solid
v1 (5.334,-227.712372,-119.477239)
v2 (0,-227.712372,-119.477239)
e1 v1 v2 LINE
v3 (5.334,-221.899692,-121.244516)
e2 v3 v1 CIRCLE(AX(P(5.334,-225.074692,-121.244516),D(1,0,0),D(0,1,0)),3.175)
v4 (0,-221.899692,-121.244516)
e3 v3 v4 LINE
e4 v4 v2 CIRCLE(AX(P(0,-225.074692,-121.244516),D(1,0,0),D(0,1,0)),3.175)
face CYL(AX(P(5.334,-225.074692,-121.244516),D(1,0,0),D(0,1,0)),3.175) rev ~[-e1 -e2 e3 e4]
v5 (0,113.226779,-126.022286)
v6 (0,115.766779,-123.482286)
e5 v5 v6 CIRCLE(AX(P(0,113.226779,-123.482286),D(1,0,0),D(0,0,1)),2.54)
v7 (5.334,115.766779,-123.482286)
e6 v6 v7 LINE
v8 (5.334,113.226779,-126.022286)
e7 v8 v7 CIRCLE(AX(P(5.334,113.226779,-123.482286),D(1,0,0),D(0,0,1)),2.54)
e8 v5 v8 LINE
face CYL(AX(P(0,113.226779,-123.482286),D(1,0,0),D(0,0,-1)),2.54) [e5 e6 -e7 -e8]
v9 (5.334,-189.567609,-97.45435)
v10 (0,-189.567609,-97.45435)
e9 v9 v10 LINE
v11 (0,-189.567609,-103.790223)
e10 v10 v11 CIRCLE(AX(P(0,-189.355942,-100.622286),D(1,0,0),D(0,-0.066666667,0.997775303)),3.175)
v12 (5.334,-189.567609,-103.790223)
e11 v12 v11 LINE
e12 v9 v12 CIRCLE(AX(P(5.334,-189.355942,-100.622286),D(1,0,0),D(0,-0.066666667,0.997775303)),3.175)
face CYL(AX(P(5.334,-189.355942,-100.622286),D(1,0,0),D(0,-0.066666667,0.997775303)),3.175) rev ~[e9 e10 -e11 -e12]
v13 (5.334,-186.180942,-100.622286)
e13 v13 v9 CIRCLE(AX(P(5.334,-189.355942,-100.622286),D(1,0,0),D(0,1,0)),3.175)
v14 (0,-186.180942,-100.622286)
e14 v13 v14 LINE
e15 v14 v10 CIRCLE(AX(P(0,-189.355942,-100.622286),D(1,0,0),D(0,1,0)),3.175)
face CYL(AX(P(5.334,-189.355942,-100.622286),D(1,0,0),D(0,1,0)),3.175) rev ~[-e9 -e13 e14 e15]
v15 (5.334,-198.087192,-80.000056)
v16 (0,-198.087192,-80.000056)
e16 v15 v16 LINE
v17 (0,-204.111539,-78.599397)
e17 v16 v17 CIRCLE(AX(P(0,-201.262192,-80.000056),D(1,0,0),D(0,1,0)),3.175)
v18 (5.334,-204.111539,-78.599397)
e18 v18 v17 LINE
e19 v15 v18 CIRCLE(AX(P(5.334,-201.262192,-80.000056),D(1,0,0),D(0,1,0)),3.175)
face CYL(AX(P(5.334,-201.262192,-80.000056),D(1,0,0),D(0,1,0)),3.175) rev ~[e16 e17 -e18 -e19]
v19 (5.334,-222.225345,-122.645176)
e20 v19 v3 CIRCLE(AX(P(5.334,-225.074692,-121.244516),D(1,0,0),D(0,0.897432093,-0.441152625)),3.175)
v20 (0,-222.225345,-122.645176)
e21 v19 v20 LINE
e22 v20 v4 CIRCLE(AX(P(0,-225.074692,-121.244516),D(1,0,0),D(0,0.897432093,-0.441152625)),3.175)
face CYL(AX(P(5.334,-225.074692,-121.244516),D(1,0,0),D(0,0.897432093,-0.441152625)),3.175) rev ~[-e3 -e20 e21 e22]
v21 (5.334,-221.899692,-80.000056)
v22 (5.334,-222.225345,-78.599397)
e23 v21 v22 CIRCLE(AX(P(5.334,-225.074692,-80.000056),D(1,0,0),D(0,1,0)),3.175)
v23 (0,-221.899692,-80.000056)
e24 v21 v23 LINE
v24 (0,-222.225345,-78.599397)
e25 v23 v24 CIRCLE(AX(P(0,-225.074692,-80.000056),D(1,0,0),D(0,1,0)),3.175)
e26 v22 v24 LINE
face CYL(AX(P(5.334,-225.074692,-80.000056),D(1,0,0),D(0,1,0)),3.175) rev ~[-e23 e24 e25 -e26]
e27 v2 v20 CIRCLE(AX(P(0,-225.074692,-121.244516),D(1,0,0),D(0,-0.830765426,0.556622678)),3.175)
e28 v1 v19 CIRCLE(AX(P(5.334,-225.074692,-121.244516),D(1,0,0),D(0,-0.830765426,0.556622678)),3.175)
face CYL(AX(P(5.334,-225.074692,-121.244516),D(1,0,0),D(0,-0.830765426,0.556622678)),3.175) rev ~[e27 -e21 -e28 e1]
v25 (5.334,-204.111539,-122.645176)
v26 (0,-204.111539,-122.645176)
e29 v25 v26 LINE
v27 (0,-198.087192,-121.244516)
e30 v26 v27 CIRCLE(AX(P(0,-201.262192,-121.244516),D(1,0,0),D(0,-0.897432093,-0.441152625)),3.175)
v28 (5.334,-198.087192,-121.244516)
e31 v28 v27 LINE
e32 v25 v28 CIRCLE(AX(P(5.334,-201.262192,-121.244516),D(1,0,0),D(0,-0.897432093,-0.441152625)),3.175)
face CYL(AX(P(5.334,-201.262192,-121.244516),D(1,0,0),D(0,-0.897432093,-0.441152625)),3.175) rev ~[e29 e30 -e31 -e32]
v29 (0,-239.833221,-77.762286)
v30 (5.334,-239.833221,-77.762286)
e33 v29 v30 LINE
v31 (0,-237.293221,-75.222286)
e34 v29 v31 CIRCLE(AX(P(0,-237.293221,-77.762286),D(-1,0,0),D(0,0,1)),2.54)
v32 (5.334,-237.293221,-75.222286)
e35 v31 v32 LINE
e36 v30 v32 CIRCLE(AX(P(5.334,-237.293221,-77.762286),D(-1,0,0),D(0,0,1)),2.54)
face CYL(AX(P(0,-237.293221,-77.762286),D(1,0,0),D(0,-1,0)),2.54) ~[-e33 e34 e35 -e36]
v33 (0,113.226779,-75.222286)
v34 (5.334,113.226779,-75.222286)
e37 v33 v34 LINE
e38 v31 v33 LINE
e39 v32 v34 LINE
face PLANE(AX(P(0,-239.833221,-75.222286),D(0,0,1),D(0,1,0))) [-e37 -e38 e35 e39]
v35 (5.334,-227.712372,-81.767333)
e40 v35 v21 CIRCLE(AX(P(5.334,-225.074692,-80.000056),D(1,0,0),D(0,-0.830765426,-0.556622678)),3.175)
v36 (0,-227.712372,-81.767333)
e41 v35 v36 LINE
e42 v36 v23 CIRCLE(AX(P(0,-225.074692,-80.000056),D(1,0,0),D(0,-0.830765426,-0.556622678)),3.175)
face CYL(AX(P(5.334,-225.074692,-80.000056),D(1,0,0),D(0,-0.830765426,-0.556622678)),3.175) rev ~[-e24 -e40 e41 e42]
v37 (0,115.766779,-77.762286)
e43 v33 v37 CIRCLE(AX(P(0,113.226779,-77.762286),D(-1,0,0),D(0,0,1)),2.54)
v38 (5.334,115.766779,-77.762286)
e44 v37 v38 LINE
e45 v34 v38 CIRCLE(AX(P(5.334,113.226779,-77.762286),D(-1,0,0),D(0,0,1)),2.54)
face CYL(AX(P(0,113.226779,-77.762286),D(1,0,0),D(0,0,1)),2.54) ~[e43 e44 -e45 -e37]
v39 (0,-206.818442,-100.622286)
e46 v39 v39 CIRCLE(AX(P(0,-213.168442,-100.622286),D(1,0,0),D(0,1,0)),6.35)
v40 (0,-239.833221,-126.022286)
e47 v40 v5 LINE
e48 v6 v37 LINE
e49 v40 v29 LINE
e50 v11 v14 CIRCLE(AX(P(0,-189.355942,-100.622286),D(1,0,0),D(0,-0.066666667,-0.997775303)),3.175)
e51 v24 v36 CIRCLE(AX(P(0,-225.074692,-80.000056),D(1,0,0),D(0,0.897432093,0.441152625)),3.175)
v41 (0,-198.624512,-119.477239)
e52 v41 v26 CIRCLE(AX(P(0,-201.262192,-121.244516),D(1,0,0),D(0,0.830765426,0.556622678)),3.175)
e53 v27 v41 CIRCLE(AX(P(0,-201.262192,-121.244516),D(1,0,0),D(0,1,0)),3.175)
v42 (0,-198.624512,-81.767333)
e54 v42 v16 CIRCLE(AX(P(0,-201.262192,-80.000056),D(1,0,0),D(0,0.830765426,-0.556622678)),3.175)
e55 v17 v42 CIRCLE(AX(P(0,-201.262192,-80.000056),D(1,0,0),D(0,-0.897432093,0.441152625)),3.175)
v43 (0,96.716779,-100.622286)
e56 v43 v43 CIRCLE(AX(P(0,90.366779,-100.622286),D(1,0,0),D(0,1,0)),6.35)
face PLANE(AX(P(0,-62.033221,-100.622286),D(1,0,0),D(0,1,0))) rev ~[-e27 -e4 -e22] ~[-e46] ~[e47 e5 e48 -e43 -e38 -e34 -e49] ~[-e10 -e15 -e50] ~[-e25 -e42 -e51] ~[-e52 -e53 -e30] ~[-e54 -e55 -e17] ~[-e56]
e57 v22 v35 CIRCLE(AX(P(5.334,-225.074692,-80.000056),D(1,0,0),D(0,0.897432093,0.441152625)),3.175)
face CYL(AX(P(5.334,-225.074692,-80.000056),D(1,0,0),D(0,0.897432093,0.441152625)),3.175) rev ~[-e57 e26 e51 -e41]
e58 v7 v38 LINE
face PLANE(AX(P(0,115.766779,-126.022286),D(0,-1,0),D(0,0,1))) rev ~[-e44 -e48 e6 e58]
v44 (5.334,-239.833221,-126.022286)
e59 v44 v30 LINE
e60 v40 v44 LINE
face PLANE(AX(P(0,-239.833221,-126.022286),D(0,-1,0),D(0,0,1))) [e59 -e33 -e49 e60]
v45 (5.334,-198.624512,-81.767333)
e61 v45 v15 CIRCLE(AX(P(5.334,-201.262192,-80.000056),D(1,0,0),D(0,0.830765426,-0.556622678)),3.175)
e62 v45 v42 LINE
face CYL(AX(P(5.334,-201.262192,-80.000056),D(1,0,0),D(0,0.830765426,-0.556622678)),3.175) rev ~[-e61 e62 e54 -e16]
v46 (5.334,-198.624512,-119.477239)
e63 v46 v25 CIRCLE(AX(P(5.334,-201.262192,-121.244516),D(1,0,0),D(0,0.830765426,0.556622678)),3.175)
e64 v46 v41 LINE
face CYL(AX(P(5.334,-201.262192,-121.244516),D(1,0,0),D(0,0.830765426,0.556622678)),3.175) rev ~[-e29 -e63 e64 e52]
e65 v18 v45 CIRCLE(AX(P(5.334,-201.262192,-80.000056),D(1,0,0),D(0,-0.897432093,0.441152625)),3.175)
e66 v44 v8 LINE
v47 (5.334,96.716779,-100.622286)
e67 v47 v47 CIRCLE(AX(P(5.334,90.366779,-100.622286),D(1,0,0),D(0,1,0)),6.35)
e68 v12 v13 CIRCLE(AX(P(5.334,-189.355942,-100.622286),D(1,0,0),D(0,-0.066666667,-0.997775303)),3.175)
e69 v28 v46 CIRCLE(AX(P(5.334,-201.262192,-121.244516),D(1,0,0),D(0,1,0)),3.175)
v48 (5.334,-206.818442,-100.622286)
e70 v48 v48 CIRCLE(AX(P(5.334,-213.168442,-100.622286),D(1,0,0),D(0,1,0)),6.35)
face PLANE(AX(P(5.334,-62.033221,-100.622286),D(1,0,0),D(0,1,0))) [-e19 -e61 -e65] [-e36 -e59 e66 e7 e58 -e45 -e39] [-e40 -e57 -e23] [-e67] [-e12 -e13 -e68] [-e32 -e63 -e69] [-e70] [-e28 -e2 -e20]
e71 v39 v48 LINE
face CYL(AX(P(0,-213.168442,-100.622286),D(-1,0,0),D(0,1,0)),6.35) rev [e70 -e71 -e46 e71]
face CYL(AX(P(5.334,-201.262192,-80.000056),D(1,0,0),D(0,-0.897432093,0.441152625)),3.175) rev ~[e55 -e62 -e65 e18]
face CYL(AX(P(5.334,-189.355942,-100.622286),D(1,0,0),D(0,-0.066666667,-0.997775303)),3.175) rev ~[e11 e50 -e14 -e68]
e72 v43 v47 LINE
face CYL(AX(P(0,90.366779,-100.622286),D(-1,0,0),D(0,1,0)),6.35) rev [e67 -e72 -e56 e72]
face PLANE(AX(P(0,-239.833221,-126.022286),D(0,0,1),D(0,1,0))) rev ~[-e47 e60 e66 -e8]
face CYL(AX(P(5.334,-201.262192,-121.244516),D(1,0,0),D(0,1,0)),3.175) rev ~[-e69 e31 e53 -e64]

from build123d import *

# Parameters (mm, degrees)
F0_W     = 355.6
F0_H     = 50.8
F0_R     = 6.35
F1_DEPTH = 5.334
F2_R     = 2.54
F4_DEPTH = 25.4


with BuildPart() as f1:
    # F0 (on Right) → F1 (new body)
    with BuildSketch(Plane.YZ):
        with Locations((-62.0332211256, -100.6222862377)):
            Rectangle(F0_W, F0_H)
        with Locations((-213.1684422493, -100.6222862377)):
            Circle(F0_R, mode=Mode.SUBTRACT)
        with Locations((90.3667788744, -100.6222862377)):
            Circle(F0_R, mode=Mode.SUBTRACT)
    extrude(amount=F1_DEPTH)

    # F2
    f2_edges = [f1.edges().sort_by_distance(p)[0] for p in [
        (2.667, 115.766779, -126.022286),
        (2.667, 115.766779, -75.222286),
        (2.667, -239.833221, -75.222286),
    ]]
    fillet(f2_edges, radius=F2_R)

    # F3 (on face) → F4 (cut)
    with BuildSketch(Plane.YZ.offset(5.334)):
        with BuildLine():
            ThreePointArc((-204.111539145, -78.5993967268), (-201.2621922493, -80.0000563101), (-198.6245120203, -81.7673333143))
            ThreePointArc((-198.6245120203, -81.7673333143), (-198.2244908381, -80.9236336682), (-198.0871922493, -80.0000563101))
            ThreePointArc((-198.0871922493, -80.0000563101), (-200.5431829982, -76.9075410398), (-204.111539145, -78.5993967268))
        make_face()
        with BuildLine():
            ThreePointArc((-227.7123724783, -81.7673333143), (-225.0746922493, -80.0000563101), (-222.2253453536, -78.5993967268))
            ThreePointArc((-222.2253453536, -78.5993967268), (-226.6621922493, -77.2504256531), (-227.7123724783, -81.7673333143))
        make_face()
        with BuildLine():
            ThreePointArc((-221.8996922493, -80.0000563101), (-221.982176979, -79.281047059), (-222.2253453536, -78.5993967268))
            ThreePointArc((-222.2253453536, -78.5993967268), (-225.0746922493, -80.0000563101), (-227.7123724783, -81.7673333143))
            ThreePointArc((-227.7123724783, -81.7673333143), (-224.1511148912, -83.0377577213), (-221.8996922493, -80.0000563101))
        make_face()
        with BuildLine():
            ThreePointArc((-204.111539145, -78.5993967268), (-202.8496922493, -82.7496869671), (-198.6245120203, -81.7673333143))
            ThreePointArc((-198.6245120203, -81.7673333143), (-201.2621922493, -80.0000563101), (-204.111539145, -78.5993967268))
        make_face()
        with BuildLine():
            ThreePointArc((-189.567608916, -103.7902228252), (-189.4089178433, -102.2097862377), (-189.3559422493, -100.6222862377))
            ThreePointArc((-189.3559422493, -100.6222862377), (-189.4089178433, -99.0347862377), (-189.567608916, -97.4543496502))
            ThreePointArc((-189.567608916, -97.4543496502), (-192.5309422493, -100.6222862377), (-189.567608916, -103.7902228252))
        make_face()
        with BuildLine():
            ThreePointArc((-189.567608916, -97.4543496502), (-189.4089178433, -99.0347862377), (-189.3559422493, -100.6222862377))
            ThreePointArc((-189.3559422493, -100.6222862377), (-189.4089178433, -102.2097862377), (-189.567608916, -103.7902228252))
            ThreePointArc((-189.567608916, -103.7902228252), (-187.1870043372, -102.9409783978), (-186.1809422493, -100.6222862377))
            ThreePointArc((-186.1809422493, -100.6222862377), (-187.1870043372, -98.3035940776), (-189.567608916, -97.4543496502))
        make_face()
        with BuildLine():
            ThreePointArc((-198.0871922493, -121.2445161653), (-198.2244908381, -120.3209388072), (-198.6245120203, -119.4772391611))
            ThreePointArc((-198.6245120203, -119.4772391611), (-201.2621922493, -121.2445161653), (-204.111539145, -122.6451757486))
            ThreePointArc((-204.111539145, -122.6451757486), (-200.5431829982, -124.3370314356), (-198.0871922493, -121.2445161653))
        make_face()
        with BuildLine():
            ThreePointArc((-204.111539145, -122.6451757486), (-201.2621922493, -121.2445161653), (-198.6245120203, -119.4772391611))
            ThreePointArc((-198.6245120203, -119.4772391611), (-202.8496922493, -118.4948855083), (-204.111539145, -122.6451757486))
        make_face()
        with BuildLine():
            ThreePointArc((-227.7123724783, -119.4772391611), (-226.6621922493, -123.9941468223), (-222.2253453536, -122.6451757486))
            ThreePointArc((-222.2253453536, -122.6451757486), (-225.0746922493, -121.2445161653), (-227.7123724783, -119.4772391611))
        make_face()
        with BuildLine():
            ThreePointArc((-227.7123724783, -119.4772391611), (-225.0746922493, -121.2445161653), (-222.2253453536, -122.6451757486))
            ThreePointArc((-222.2253453536, -122.6451757486), (-221.982176979, -121.9635254164), (-221.8996922493, -121.2445161653))
            ThreePointArc((-221.8996922493, -121.2445161653), (-224.1511148912, -118.2068147541), (-227.7123724783, -119.4772391611))
        make_face()
    extrude(amount=-F4_DEPTH, mode=Mode.SUBTRACT)


solid = f1.part
